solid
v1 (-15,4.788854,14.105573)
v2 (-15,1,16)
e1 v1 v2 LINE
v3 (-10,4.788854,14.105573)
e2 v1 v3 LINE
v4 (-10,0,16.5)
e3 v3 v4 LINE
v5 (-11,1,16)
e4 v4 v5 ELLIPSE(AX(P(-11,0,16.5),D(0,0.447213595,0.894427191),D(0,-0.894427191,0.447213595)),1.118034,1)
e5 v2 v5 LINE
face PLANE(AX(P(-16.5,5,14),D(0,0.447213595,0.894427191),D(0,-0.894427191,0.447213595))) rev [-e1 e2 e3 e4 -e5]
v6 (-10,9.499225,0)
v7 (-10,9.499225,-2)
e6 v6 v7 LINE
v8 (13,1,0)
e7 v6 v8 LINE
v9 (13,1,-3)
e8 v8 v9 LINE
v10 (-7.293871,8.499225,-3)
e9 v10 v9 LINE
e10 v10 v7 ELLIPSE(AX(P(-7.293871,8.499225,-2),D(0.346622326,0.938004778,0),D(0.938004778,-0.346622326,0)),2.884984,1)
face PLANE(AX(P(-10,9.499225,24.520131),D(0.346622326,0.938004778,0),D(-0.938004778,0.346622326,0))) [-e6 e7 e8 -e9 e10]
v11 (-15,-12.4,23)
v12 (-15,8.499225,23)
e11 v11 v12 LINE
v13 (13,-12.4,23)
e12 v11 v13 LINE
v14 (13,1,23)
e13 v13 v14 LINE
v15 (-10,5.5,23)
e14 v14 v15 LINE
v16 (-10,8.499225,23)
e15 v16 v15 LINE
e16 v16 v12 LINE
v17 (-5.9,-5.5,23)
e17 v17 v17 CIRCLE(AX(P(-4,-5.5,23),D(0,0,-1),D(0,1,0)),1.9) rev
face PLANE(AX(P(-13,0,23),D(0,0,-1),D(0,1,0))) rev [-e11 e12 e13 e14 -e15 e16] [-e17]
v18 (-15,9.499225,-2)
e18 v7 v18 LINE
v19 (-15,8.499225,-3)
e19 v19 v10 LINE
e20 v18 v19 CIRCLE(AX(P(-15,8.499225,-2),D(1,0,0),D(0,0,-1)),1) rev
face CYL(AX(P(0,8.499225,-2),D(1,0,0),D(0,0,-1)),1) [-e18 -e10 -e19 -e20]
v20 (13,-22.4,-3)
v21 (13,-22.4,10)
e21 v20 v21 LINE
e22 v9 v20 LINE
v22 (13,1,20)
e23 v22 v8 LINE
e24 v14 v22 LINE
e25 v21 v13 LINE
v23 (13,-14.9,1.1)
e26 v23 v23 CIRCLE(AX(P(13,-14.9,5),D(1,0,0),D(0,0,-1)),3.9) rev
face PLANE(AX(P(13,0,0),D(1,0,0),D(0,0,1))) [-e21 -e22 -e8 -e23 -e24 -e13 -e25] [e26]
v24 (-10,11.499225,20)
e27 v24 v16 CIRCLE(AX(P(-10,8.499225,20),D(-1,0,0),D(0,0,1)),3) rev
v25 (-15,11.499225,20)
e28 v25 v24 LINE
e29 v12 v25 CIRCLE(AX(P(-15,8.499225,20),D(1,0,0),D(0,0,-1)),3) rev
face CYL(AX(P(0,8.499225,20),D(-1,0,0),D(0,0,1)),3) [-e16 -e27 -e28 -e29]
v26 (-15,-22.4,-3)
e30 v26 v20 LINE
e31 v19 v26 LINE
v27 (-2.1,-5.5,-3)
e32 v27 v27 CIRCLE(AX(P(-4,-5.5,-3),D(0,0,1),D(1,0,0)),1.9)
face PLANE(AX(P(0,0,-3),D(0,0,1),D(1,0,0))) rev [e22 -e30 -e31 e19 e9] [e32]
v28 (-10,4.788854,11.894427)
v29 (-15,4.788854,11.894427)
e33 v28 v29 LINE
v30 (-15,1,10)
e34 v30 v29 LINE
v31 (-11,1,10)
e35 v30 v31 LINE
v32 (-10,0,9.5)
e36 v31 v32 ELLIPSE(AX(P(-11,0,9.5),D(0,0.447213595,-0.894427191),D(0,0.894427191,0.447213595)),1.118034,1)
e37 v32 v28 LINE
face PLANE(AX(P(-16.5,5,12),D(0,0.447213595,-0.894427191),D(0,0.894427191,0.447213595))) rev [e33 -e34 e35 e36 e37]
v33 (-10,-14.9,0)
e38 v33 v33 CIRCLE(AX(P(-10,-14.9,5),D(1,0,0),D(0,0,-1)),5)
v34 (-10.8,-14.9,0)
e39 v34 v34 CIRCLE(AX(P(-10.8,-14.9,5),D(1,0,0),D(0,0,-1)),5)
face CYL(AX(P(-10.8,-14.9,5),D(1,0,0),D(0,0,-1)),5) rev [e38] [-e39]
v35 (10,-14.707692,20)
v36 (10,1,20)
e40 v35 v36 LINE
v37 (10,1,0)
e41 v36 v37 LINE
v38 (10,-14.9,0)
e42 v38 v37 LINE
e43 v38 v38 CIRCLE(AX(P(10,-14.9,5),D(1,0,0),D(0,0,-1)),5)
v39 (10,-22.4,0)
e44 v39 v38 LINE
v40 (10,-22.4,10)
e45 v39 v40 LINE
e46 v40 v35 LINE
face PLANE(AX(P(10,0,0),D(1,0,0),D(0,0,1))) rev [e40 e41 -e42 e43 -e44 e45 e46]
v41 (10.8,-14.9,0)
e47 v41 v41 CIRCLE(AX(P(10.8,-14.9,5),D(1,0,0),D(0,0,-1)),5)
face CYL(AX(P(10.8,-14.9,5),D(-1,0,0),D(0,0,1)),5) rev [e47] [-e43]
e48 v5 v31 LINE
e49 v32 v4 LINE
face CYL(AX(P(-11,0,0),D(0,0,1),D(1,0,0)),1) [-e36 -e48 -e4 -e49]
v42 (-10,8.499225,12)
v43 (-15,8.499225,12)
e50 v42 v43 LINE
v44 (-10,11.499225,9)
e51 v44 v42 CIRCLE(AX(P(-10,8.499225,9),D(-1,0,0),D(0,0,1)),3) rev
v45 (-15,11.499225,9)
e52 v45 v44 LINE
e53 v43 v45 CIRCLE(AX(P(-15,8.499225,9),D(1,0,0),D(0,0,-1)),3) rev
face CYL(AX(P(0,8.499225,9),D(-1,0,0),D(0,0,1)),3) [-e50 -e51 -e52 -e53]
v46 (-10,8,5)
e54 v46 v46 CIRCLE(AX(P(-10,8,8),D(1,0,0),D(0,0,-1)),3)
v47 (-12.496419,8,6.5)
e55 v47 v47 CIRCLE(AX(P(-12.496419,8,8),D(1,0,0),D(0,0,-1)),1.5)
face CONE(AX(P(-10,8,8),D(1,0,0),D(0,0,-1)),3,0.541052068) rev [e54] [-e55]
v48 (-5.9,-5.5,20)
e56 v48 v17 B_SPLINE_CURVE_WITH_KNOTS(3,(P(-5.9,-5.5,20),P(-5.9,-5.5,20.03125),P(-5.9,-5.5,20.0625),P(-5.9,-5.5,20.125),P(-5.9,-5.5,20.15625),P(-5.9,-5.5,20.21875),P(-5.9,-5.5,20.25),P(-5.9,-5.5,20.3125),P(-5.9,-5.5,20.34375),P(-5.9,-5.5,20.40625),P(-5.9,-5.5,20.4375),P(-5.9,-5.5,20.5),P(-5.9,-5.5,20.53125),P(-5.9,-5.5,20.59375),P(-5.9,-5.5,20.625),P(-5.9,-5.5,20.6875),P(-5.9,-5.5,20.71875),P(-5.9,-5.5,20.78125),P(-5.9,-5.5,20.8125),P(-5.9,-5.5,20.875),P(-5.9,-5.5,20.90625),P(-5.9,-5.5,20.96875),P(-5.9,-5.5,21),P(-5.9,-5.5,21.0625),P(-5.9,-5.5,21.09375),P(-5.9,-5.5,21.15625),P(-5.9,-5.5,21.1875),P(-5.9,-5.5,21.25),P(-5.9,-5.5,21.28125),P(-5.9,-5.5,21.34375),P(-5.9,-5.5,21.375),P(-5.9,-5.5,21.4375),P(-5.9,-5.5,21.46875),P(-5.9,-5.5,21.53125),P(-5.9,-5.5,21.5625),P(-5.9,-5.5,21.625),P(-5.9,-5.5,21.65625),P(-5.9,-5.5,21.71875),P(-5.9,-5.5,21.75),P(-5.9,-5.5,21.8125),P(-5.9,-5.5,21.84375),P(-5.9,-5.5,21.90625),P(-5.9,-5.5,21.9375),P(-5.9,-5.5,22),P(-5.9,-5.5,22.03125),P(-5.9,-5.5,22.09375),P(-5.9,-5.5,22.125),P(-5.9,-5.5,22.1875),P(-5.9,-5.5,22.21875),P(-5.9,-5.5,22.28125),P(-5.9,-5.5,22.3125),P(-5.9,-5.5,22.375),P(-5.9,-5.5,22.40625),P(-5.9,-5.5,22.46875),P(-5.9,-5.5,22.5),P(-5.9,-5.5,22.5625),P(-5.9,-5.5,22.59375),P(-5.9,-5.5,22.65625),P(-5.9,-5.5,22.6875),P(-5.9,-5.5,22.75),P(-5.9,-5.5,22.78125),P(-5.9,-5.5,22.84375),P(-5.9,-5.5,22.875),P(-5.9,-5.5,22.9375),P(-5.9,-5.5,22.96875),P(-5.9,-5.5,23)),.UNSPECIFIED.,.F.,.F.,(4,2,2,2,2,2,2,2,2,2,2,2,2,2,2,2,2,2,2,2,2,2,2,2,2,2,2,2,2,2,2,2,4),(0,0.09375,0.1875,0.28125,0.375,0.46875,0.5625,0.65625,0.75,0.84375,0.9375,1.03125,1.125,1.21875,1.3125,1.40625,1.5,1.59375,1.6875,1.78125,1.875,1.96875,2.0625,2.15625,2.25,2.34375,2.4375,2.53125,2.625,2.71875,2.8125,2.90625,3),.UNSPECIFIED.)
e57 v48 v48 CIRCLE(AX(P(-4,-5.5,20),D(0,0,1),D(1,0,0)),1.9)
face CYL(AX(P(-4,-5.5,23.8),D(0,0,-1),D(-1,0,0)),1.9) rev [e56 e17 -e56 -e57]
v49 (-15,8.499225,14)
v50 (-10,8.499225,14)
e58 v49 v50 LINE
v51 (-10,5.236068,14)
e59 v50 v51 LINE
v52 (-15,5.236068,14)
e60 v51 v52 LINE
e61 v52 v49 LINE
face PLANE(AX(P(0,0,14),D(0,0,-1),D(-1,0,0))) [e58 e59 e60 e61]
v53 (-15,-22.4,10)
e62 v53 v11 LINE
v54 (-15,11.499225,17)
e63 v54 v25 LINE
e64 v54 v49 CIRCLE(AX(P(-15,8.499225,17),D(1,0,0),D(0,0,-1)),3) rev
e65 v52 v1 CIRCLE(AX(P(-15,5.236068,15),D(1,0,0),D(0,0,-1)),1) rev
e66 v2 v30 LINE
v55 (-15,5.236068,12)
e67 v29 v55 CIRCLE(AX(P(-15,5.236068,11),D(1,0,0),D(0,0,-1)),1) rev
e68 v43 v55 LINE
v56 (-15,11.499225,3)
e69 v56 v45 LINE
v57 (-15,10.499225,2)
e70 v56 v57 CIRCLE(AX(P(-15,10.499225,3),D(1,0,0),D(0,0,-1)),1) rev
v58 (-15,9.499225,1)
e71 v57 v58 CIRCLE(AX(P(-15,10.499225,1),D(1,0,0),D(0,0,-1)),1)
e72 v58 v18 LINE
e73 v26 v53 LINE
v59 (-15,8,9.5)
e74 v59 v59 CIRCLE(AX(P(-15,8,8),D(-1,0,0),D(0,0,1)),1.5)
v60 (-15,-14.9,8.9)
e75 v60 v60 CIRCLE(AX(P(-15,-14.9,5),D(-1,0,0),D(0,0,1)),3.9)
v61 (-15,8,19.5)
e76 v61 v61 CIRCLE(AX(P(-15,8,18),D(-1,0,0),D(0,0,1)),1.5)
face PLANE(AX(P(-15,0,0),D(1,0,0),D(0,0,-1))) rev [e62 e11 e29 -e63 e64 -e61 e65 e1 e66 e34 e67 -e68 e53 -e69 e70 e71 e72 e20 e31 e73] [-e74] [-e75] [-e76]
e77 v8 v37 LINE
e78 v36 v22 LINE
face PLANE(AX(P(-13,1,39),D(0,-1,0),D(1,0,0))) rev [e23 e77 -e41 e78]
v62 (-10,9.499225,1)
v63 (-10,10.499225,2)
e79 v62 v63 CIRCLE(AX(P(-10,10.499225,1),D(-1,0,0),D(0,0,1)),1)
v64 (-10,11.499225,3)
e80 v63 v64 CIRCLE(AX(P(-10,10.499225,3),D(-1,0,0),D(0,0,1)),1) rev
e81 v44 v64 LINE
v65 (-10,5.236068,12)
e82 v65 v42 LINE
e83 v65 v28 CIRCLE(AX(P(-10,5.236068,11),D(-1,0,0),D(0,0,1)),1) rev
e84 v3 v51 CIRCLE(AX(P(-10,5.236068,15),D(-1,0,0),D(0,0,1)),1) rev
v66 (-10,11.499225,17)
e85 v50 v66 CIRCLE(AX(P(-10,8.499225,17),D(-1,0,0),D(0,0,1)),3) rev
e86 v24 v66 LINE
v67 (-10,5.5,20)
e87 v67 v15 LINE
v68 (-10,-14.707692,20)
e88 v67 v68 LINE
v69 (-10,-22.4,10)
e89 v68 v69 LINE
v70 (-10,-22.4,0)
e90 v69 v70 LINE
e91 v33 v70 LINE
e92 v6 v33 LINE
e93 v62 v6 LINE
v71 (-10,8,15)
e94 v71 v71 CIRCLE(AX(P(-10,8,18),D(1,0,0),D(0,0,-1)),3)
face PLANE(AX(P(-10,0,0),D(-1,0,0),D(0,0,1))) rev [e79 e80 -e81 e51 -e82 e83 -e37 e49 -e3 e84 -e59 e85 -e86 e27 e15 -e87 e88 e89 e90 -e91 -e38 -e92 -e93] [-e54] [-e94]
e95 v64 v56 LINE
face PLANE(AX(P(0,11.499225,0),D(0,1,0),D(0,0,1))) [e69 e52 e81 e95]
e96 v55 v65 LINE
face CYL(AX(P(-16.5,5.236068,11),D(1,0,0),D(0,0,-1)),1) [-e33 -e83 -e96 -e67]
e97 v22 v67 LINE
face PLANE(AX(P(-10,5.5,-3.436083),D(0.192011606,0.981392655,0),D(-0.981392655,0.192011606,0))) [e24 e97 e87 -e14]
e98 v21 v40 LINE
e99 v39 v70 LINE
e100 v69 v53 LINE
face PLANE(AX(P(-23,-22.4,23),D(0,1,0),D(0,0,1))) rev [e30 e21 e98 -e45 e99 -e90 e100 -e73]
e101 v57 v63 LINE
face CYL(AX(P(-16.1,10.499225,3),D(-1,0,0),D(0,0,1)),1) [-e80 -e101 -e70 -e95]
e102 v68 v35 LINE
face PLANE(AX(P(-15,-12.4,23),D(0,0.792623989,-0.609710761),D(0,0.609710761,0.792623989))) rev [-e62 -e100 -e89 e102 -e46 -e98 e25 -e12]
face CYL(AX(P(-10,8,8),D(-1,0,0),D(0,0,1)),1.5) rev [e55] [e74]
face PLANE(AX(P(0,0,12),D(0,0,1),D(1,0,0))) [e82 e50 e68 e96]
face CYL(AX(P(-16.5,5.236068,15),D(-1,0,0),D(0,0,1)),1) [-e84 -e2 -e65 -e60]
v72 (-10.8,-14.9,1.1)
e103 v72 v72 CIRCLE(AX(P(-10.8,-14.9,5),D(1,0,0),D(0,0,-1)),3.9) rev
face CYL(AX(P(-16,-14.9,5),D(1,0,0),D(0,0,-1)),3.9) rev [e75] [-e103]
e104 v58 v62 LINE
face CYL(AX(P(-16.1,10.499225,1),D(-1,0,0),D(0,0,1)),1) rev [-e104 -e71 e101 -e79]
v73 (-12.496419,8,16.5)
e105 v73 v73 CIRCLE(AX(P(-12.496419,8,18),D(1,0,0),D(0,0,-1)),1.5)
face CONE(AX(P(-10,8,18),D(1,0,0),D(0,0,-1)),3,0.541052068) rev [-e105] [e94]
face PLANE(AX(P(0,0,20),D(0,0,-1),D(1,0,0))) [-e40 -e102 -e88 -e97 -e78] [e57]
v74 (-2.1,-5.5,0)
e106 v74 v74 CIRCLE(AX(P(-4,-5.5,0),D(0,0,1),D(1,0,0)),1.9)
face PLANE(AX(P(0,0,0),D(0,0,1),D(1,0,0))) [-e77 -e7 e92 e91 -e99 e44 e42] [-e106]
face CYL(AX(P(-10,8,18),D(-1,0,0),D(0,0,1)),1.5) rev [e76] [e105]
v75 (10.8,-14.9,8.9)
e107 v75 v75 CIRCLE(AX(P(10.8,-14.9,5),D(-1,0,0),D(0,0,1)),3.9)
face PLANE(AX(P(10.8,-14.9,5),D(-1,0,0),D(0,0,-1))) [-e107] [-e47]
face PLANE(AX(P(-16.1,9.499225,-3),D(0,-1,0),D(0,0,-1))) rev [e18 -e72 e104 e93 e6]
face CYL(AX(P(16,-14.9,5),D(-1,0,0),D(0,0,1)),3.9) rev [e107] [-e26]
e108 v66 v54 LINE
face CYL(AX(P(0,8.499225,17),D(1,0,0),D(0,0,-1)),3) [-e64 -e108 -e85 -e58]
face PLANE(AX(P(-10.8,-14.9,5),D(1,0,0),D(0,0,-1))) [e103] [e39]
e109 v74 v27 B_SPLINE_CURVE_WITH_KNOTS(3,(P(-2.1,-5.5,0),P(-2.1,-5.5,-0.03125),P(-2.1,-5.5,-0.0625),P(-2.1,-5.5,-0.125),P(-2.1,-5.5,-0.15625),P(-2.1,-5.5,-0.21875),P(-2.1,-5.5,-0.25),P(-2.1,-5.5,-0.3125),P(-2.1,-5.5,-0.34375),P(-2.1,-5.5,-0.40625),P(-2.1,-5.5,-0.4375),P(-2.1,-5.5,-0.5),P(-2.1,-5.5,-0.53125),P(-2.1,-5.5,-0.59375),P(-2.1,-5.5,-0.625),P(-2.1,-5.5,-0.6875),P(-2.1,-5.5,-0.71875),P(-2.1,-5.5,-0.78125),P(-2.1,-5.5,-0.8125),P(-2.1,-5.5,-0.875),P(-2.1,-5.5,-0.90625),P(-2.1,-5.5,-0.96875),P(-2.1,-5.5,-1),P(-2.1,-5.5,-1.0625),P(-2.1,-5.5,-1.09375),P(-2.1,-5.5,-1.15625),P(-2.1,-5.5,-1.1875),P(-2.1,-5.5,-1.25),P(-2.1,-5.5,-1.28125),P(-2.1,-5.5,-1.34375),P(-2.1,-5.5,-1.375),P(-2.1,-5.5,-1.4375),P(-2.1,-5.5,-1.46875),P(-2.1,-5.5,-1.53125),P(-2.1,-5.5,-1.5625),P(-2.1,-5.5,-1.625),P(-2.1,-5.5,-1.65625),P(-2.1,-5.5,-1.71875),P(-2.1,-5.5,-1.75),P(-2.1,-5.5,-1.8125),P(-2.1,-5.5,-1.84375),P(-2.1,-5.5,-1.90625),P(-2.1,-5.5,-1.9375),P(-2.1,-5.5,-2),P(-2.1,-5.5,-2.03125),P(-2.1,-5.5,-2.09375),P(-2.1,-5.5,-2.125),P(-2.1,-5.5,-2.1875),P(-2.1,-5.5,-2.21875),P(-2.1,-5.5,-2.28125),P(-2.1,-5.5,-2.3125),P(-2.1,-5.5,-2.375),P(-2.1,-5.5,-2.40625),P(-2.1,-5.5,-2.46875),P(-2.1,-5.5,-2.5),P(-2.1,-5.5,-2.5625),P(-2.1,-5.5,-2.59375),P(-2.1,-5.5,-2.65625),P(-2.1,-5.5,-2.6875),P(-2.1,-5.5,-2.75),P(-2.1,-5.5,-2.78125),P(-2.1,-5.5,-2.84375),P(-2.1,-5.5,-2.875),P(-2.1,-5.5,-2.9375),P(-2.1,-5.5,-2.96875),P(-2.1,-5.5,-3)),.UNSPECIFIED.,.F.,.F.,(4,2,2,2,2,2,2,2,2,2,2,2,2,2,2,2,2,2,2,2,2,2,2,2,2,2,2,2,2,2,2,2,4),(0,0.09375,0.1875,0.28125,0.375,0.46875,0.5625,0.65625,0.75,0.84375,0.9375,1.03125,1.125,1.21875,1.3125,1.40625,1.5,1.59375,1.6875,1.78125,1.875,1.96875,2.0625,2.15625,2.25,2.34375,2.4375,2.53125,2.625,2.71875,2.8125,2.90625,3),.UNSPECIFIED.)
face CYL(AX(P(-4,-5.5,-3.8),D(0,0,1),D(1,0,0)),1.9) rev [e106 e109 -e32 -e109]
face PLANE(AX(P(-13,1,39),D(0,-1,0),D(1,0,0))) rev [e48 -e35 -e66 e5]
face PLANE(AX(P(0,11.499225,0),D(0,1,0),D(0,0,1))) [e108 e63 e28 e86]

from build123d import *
from build123d.topology import SkipClean

# Parameters (mm, degrees)
SKETCH_1_W                = 20
SKETCH_1_H                = 57.76596942167697
EXTRUDE_1_DEPTH           = 3
EXTRUDE_2_DEPTH           = 3
CUT_EXTRUDE_1_DEPTH       = 6
SKETCH_8_R                = 4.48
CUT_EXTRUDE_2_DEPTH       = 0.8
SKETCH_9_R                = 1.9
CUT_EXTRUDE_3_DEPTH       = 3.8
SKETCH_12_W               = 26.000000000000007
SKETCH_12_H               = 35.36596942167698
CUT_EXTRUDE_4_DEPTH       = 36.00000000000001
CUT_EXTRUDE_8_DEPTH       = 28.00000000000001
SKETCH_23_W               = 26.000000000000004
SKETCH_23_H               = 26
SKETCH_23_W_2             = 20
SKETCH_23_H_2             = 19.999999999999993
EXTRUDE_7_DEPTH           = 4
SKETCH_24_W               = 20
SKETCH_24_H               = 19.999999999999993
EXTRUDE_8_DEPTH           = 3
SKETCH_25_W               = 5.000000000000002
SKETCH_25_H               = 16
SKETCH_25_R               = 1.4999999999999991
EXTRUDE_9_DEPTH           = 3
FILLET_1_R                = 1
CUT_EXTRUDE_9_DEPTH       = 3
SKETCH_27_R               = 1.4999999999999987
CUT_EXTRUDE_10_DEPTH      = 3
SKETCH_28_W               = 20
SKETCH_28_H               = 19.999999999999993
CUT_EXTRUDE_11_DEPTH      = 10
CUT_EXTRUDE_12_DEPTH      = 42.00000000000001
SKETCH_31_R               = 4.48
SKETCH_31_R_2             = 3.98
EXTRUDE_13_DEPTH          = 0.8
SKETCH_32_R               = 5.000000000000001
SKETCH_32_R_2             = 3.98
CUT_EXTRUDE_13_DEPTH      = 0.8
SKETCH_33_R               = 4.48
EXTRUDE_14_DEPTH          = 3
SKETCH_36_R               = 5.000000000000001
CUT_EXTRUDE_14_DEPTH      = 3
SKETCH_37_R               = 3.98
SKETCH_37_R_2             = 3.900000000000001
EXTRUDE_17_DEPTH          = 0.8
SKETCH_38_R               = 1.5000000000000009
EXTRUDE_18_DEPTH          = 3
SKETCH_39_W               = 4.187599959799879
SKETCH_39_H               = 1.3608825238343043
EXTRUDE_19_DEPTH          = 3
EXTRUDE_START             = 2
SKETCH_43_R               = 1.5000000000000024
SKETCH_43_R_2             = 1.5000000000000009
SKETCH_43_R_3             = 3.900000000000002
EXTRUDE_22_DEPTH          = 2
SKETCH_44_W               = 5
SKETCH_44_H               = 9.399224841629362
EXTRUDE_23_DEPTH          = 2
EXTRUDE_24_DEPTH          = 3
SKETCH_47_W               = 5
SKETCH_47_H               = 9.399224841629362
EXTRUDE_25_DEPTH          = 8
SKETCH_51_W               = 5
SKETCH_51_H               = 14
SKETCH_51_H_2             = 7.999999999999998
EXTRUDE_28_DEPTH          = 1.1
CUT_EXTRUDE_16_DEPTH      = 6.1000000000000005
FILLET_START              = -16
FILLET_9_DEPTH            = 7
FILLET_START_2            = -15
FILLET_9_2_DEPTH          = 5
EXTRUDE_30_DEPTH          = 3
FILLET_10_R               = 1
SKETCH_57_W               = 5
SKETCH_57_H               = 10.499224841629362
EXTRUDE_31_DEPTH          = 1
SKETCH_58_W               = 5
SKETCH_58_H               = 10.499224841629362
EXTRUDE_32_DEPTH          = 1
FILLET_11_R               = 3
CUT_EXTRUDE_19_DEPTH      = 6.500000000000001
FILLET_14_R               = 1
FILLET_19_R               = 1
HOLE_WIZARD_1_D           = 3
HOLE_WIZARD_1_DEPTH       = 5
HOLE_WIZARD_1_CSINK_D     = 6
HOLE_WIZARD_1_CSINK_ANGLE = 62


with BuildPart() as part:
    # 草图1 → 凸台-拉伸1 (new body)
    with BuildSketch(Plane.XY):
        with Locations((0, -28.882984710838485)):
            Rectangle(SKETCH_1_W, SKETCH_1_H)
    extrude_1 = extrude(amount=-EXTRUDE_1_DEPTH)

    # 草图2 → 凸台-拉伸2 (add)
    with BuildSketch(Plane.ZY.offset(10)):
        Polygon((-3, -1.22e-15), (23, 0), (23.000000000000007, -57.76596942167697), (-3, -57.76596942167697), align=None)
    extrude_2 = extrude(amount=EXTRUDE_2_DEPTH)

    # 草图7 → 切除-拉伸1 (cut)
    with BuildSketch(Plane(origin=(-10, 0, 0), x_dir=(0, 0, -1), z_dir=(1, 0, 0))):
        with BuildLine():
            ThreePointArc((-1.0999999999999996, -14.899999999999997), (-5, -10.999999999999996), (-8.9, -14.899999999999997))
            Line((-8.9, -14.899999999999997), (-1.1000000000000014, -14.899999999999997))
        make_face()
        with BuildLine():
            Line((-1.1000000000000014, -14.899999999999997), (-8.9, -14.899999999999997))
            ThreePointArc((-8.9, -14.899999999999997), (-5.000000000000001, -18.799999999999997), (-1.0999999999999996, -14.899999999999999))
        make_face()
    cut_extrude_1 = extrude(amount=-CUT_EXTRUDE_1_DEPTH, mode=Mode.SUBTRACT)

    # 草图8 → 切除-拉伸2 (cut)
    with BuildSketch(Plane.ZY.offset(13.000000000000002)):
        with Locations((5, -14.899999999999997)):
            Circle(SKETCH_8_R)
    cut_extrude_2 = extrude(amount=-CUT_EXTRUDE_2_DEPTH, mode=Mode.SUBTRACT)

    # 草图9 → 切除-拉伸3 (cut)
    with BuildSketch(Plane.XY):
        with Locations((-4, -5.499999999999998)):
            Circle(SKETCH_9_R)
    cut_extrude_3 = extrude(amount=-CUT_EXTRUDE_3_DEPTH, mode=Mode.SUBTRACT)

    # 镜向1: 凸台-拉伸2 across plane
    add(extrude_2.mirror(Plane(origin=(0, 0, 0), x_dir=(0, 0, 1), z_dir=(1, 0, 0))))

    # 镜向2: 切除-拉伸1, 切除-拉伸2 across plane
    add(cut_extrude_1.mirror(Plane(origin=(0, 0, 0), x_dir=(0, 0, 1), z_dir=(1, 0, 0))), mode=Mode.SUBTRACT)
    add(cut_extrude_2.mirror(Plane(origin=(0, 0, 0), x_dir=(0, 0, 1), z_dir=(1, 0, 0))), mode=Mode.SUBTRACT)

    # 镜向3: 凸台-拉伸1 across plane
    add(extrude_1.mirror(Plane.XY.offset(10)))

    # 镜向5: 切除-拉伸3 across plane
    add(cut_extrude_3.mirror(Plane.XY.offset(10)), mode=Mode.SUBTRACT)

    # 草图12 → 切除-拉伸4 (cut)
    with BuildSketch(Plane(origin=(13.000000000000002, 0, 0), x_dir=(0, 0, -1), z_dir=(1, 0, 0))):
        with Locations((-10.000000000000004, -40.08298471083848)):
            Rectangle(SKETCH_12_W, SKETCH_12_H)
    extrude(amount=-CUT_EXTRUDE_4_DEPTH, mode=Mode.SUBTRACT)

    # 草图22 → 切除-拉伸8 (cut)
    with BuildSketch(Plane(origin=(13.000000000000002, 0, 0), x_dir=(0, 0, -1), z_dir=(1, 0, 0))):
        Polygon((-23.000000000000007, -12.399999999999997), (-23.000000000000007, -22.399999999999995), (-10.000000000000007, -22.399999999999995), align=None)
    extrude(amount=-CUT_EXTRUDE_8_DEPTH, mode=Mode.SUBTRACT)

    # 草图23 → 凸台-拉伸7 (add)
    with BuildSketch(Plane(origin=(0, 0, 0), x_dir=(1, 0, 0), z_dir=(0, 1, 0))):
        with Locations((0, -10)):
            Rectangle(SKETCH_23_W, SKETCH_23_H)
        with Locations((0, -9.999999999999996)):
            Rectangle(SKETCH_23_W_2, SKETCH_23_H_2, mode=Mode.SUBTRACT)
    extrude(amount=EXTRUDE_7_DEPTH)

    # 草图24 → 凸台-拉伸8 (add)
    with BuildSketch(Plane(origin=(0, 4, 0), x_dir=(1, 0, 0), z_dir=(0, 1, 0))):
        with Locations((0, -9.999999999999996)):
            Rectangle(SKETCH_24_W, SKETCH_24_H)
    extrude(amount=-EXTRUDE_8_DEPTH)

    # 草图25 → 凸台-拉伸9 (add)
    with BuildSketch(Plane(origin=(0, 4, 0), x_dir=(1, 0, 0), z_dir=(0, 1, 0))):
        with Locations((15.500000000000004, -15)):
            Rectangle(SKETCH_25_W, SKETCH_25_H)
        with Locations(Location((15.500000000000002, -20.23329325648959, 0), (0, 0, 270))):
            Circle(SKETCH_25_R, mode=Mode.SUBTRACT)
        with Locations(Location((15.500000000000002, -10.23329325648959, 0), (0, 0, 270))):
            Circle(SKETCH_25_R, mode=Mode.SUBTRACT)
    extrude(amount=-EXTRUDE_9_DEPTH)

    # 圆角1
    fillet_1_edges = [part.edges().sort_by_distance(p)[0] for p in [
        (18.000000000000004, 1, 15),
    ]]
    fillet(fillet_1_edges, radius=FILLET_1_R)

    # 草图26 → 切除-拉伸9 (cut)
    with BuildSketch(Plane(origin=(13.000000000000002, 0, 0), x_dir=(0, 0, -1), z_dir=(1, 0, 0))):
        with BuildLine():
            Line((-16, 1.0000000000000004), (-13.999999999999998, 1.0000000000000004))
            ThreePointArc((-13.999999999999998, 1.0000000000000004), (-15, 0), (-16, 1.0000000000000004))
        make_face()
    extrude(amount=-CUT_EXTRUDE_9_DEPTH, mode=Mode.SUBTRACT)

    # 草图27 → 切除-拉伸10 (cut)
    with BuildSketch(Plane(origin=(0, 4, 0), x_dir=(1, 0, 0), z_dir=(0, 1, 0))):
        with Locations(Location((7.500000000000002, -15.233293256489592, 0), (0, 0, 270))):
            Circle(SKETCH_27_R)
    extrude(amount=-CUT_EXTRUDE_10_DEPTH, mode=Mode.SUBTRACT)

    # 草图28 → 切除-拉伸11 (cut)
    with BuildSketch(Plane.XZ.offset(-1)):
        with Locations((0, 9.999999999999996)):
            Rectangle(SKETCH_28_W, SKETCH_28_H)
    extrude(amount=-CUT_EXTRUDE_11_DEPTH, mode=Mode.SUBTRACT)

    # 草图29 → 切除-拉伸12 (cut)
    with BuildSketch(Plane(origin=(0, 0, -3), x_dir=(-1, 0, 0), z_dir=(0, 0, -1))):
        Polygon((13.000000000000002, 4), (-24.68163228941081, 4), (-24.68163228941081, 0.9999999999999957), (13.000000000000002, 1.0000000000000002), align=None)
    extrude(amount=-CUT_EXTRUDE_12_DEPTH, mode=Mode.SUBTRACT)

    # 草图31 → 凸台-拉伸13 (add)
    with BuildSketch(Plane.ZY.offset(12.200000000000001)):
        with Locations((5, -14.899999999999997)):
            Circle(SKETCH_31_R)
        with Locations((5, -14.899999999999997)):
            Circle(SKETCH_31_R_2, mode=Mode.SUBTRACT)
    extrude(amount=EXTRUDE_13_DEPTH)

    # 草图32 → 切除-拉伸13 (cut)
    with BuildSketch(Plane(origin=(-10, 0, 0), x_dir=(0, 0, -1), z_dir=(1, 0, 0))):
        with Locations((-5, -14.899999999999997)):
            Circle(SKETCH_32_R)
        with Locations(Location((-5, -14.899999999999997, 0), (0, 0, 180))):
            Circle(SKETCH_32_R_2, mode=Mode.SUBTRACT)
    cut_extrude_13 = extrude(amount=-CUT_EXTRUDE_13_DEPTH, mode=Mode.SUBTRACT)

    # 草图33 → 凸台-拉伸14 (add)
    with BuildSketch(Plane(origin=(13.000000000000002, 0, 0), x_dir=(0, 0, -1), z_dir=(1, 0, 0))):
        with Locations((-5, -14.899999999999997)):
            Circle(SKETCH_33_R)
    extrude(amount=-EXTRUDE_14_DEPTH)

    # 镜向6: 切除-拉伸1, 切除-拉伸13 across plane
    add(cut_extrude_1.mirror(Plane(origin=(0, 0, 0), x_dir=(0, 0, 1), z_dir=(1, 0, 0))), mode=Mode.SUBTRACT)
    add(cut_extrude_13.mirror(Plane(origin=(0, 0, 0), x_dir=(0, 0, 1), z_dir=(1, 0, 0))), mode=Mode.SUBTRACT)

    # 草图36 → 切除-拉伸14 (cut)
    with BuildSketch(Plane(origin=(-10.8, 0, 0), x_dir=(0, 0, -1), z_dir=(1, 0, 0))):
        with Locations((-5, -14.899999999999997)):
            Circle(SKETCH_36_R)
    cut_extrude_14 = extrude(amount=CUT_EXTRUDE_14_DEPTH, mode=Mode.SUBTRACT)

    # 镜向7: 切除-拉伸14 across plane
    add(cut_extrude_14.mirror(Plane(origin=(0, 0, 0), x_dir=(0, 0, 1), z_dir=(1, 0, 0))), mode=Mode.SUBTRACT)

    # 草图37 → 凸台-拉伸17 (add)
    with SkipClean():  # the faces are left unmerged after this step: merging them gives an invalid solid
        with BuildSketch(Plane.ZY.offset(12.200000000000001)):
            with Locations((5, -14.899999999999997)):
                Circle(SKETCH_37_R)
            with Locations((5, -14.899999999999997)):
                Circle(SKETCH_37_R_2, mode=Mode.SUBTRACT)
        extrude(amount=EXTRUDE_17_DEPTH)

    # 草图38 → 凸台-拉伸18 (add)
    # profile 1 of 2: a face of its own
    with SkipClean():  # the faces are left unmerged after this step: merging them gives an invalid solid
        with BuildSketch(Plane.ZY.offset(13.000000000000002)):
            Polygon((15, 10.399224841629362), (15, 1), (20.999999999999996, 1.0000000000000002), (20.999999999999996, 10.399224841629362), align=None)
            with Locations((18, 8)):
                Circle(SKETCH_38_R, mode=Mode.SUBTRACT)
        # profile 2 of 2: a face of its own
        with BuildSketch(Plane.ZY.offset(13.000000000000002)):
            Polygon((11, 1), (11, 10.399224841629362), (5.000000000000001, 10.399224841629362), (5.000000000000001, 1.0000000000000002), align=None)
            with Locations((8, 8)):
                Circle(SKETCH_38_R, mode=Mode.SUBTRACT)
        extrude(amount=-EXTRUDE_18_DEPTH)

    # 草图39 → 凸台-拉伸19 (add)
    with SkipClean():  # the faces are left unmerged after this step: merging them gives an invalid solid
        with BuildSketch(Plane(origin=(13.000000000000002, 0, 0), x_dir=(0, 0, -1), z_dir=(1, 0, 0))):
            with Locations((-15.28799119011226, 0.3195587380828476)):
                Rectangle(SKETCH_39_W, SKETCH_39_H)
        extrude(amount=-EXTRUDE_19_DEPTH)

    # 草图43 → 凸台-拉伸22 (add)
    with BuildSketch(Plane.ZY.offset(13.000000000000002).offset(EXTRUDE_START)):
        Polygon((-3, 1.0000000000000002), (5.000000000000004, 1.0000000000000002), (5.000000000000001, 10.399224841629362), (11, 10.399224841629362), (11, 1.0000000000000002), (15, 1.0000000000000002), (15, 10.399224841629362), (20.999999999999996, 10.399224841629362), (20.999999999999996, 1.0000000000000002), (23.000000000000007, 1.0000000000000002), (23.000000000000007, -12.399999999999997), (10.000000000000009, -22.399999999999995), (-3, -22.399999999999995), align=None)
        with Locations((8, 8)):
            Circle(SKETCH_43_R, mode=Mode.SUBTRACT)
        with Locations((18, 8)):
            Circle(SKETCH_43_R_2, mode=Mode.SUBTRACT)
        with Locations((5, -14.899999999999997)):
            Circle(SKETCH_43_R_3, mode=Mode.SUBTRACT)
    extrude(amount=-EXTRUDE_22_DEPTH)

    # 草图44 → 凸台-拉伸23 (add)
    with BuildSketch(Plane.XY.offset(20.999999999999996)):
        with Locations((-12.500000000000002, 5.699612420814681)):
            Rectangle(SKETCH_44_W, SKETCH_44_H)
    extrude(amount=EXTRUDE_23_DEPTH)

    # 草图45 → 凸台-拉伸24 (add)
    with BuildSketch(Plane.XY.offset(23)):
        Polygon((-10.000000000000002, 0.9999999999999981), (13.000000000000002, 0.9999999999999943), (-10.000000000000002, 5.499999999999998), align=None)
    extrude(amount=-EXTRUDE_24_DEPTH)

    # 草图47 → 凸台-拉伸25 (add)
    with BuildSketch(Plane(origin=(0, 0, 5.000000000000001), x_dir=(-1, 0, 0), z_dir=(0, 0, -1))):
        with Locations((12.500000000000002, 5.699612420814681)):
            Rectangle(SKETCH_47_W, SKETCH_47_H)
    extrude(amount=EXTRUDE_25_DEPTH)

    # 草图51 → 凸台-拉伸28 (add)
    with BuildSketch(Plane(origin=(0, 10.399224841629362, 0), x_dir=(1, 0, 0), z_dir=(0, 1, 0))):
        with Locations((-12.500000000000002, -4)):
            Rectangle(SKETCH_51_W, SKETCH_51_H)
        with Locations((-12.500000000000002, -19)):
            Rectangle(SKETCH_51_W, SKETCH_51_H_2)
    extrude(amount=EXTRUDE_28_DEPTH)

    # 草图53 → 切除-拉伸16 (cut)
    with BuildSketch(Plane(origin=(-10, 0, 0), x_dir=(0, 0, -1), z_dir=(1, 0, 0))):
        Polygon((2.999999999999999, 11.499224841629362), (-2.000000000000001, 11.499224841629362), (-2.0000000000000004, 9.49922484162936), (2.999999999999999, 9.499224841629362), align=None)
    extrude(amount=-CUT_EXTRUDE_16_DEPTH, mode=Mode.SUBTRACT)

    # 圆角9: read off the stored shape, not the designer's step
    # 圆角9 outline → 圆角9 (cut)
    with BuildSketch(Plane.YZ.offset(FILLET_START)):
        with BuildLine():
            Line((11.499224842, 2), (11.499224842, 3))
            ThreePointArc((11.499224842, 3), (11.206331623, 2.292893219), (10.499224842, 2))
            Line((10.499224842, 2), (11.499224842, 2))
        make_face()
    extrude(amount=FILLET_9_DEPTH, mode=Mode.SUBTRACT)

    # Fillet 9 2 outline → Fillet 9 2 (add)
    with BuildSketch(Plane.YZ.offset(FILLET_START_2)):
        with BuildLine():
            ThreePointArc((9.499224842, 1), (9.79211806, 1.707106782), (10.499224842, 2))
            Line((10.499224842, 2), (9.499224842, 2))
            Line((9.499224842, 2), (9.499224842, 1))
        make_face()
    extrude(amount=FILLET_9_2_DEPTH)

    # 草图54 → 凸台-拉伸30 (add)
    with BuildSketch(Plane(origin=(0, 0, -3), x_dir=(-1, 0, 0), z_dir=(0, 0, -1))):
        Polygon((-13.000000000000002, 0.9999999999999972), (10.000000000000002, 1.0000000000000002), (10, 9.499224841629362), align=None)
    extrude(amount=-EXTRUDE_30_DEPTH)

    # 圆角10
    fillet_10_edges = [part.edges().sort_by_distance(p)[0] for p in [
        (-12.5, 9.499224841629362, -2.999999999999999),
    ]]
    fillet(fillet_10_edges, radius=FILLET_10_R)

    # 草图57 → 凸台-拉伸31 (add)
    with BuildSketch(Plane(origin=(0, 0, 15), x_dir=(-1, 0, 0), z_dir=(0, 0, -1))):
        with Locations((12.500000000000002, 6.249612420814681)):
            Rectangle(SKETCH_57_W, SKETCH_57_H)
    extrude(amount=EXTRUDE_31_DEPTH)

    # 草图58 → 凸台-拉伸32 (add)
    with BuildSketch(Plane.XY.offset(11)):
        with Locations((-12.500000000000002, 6.249612420814681)):
            Rectangle(SKETCH_58_W, SKETCH_58_H)
    extrude(amount=EXTRUDE_32_DEPTH)

    # 圆角11
    # the kernel refuses this fillet: 3 mm, written as the material it takes off along each edge
    with BuildSketch(Plane(origin=(-2.5000000000000018, 11.499224841629362, 23), x_dir=(0, -1, 0), z_dir=(-1, 0, 0)), Plane(origin=(-2.5000000000000018, 11.499224841629362, 14), x_dir=(0, 0, 1), z_dir=(-1, 0, 0))) as fillet_11_piece_1:
        with BuildLine():
            CenterArc((FILLET_11_R, -FILLET_11_R), FILLET_11_R, 90, 90)
            Line((0, -FILLET_11_R), (0, 0))
            Line((0, 0), (FILLET_11_R, 0))
        make_face()
    extrude(amount=20, mode=Mode.SUBTRACT)
    with BuildSketch(Plane(origin=(-22.5, 11.499224841629362, 12), x_dir=(0, -1, 0), z_dir=(1, 0, 0))) as fillet_11_piece_2:
        with BuildLine():
            CenterArc((FILLET_11_R, FILLET_11_R), FILLET_11_R, 180, 90)
            Line((0, FILLET_11_R), (0, 0))
            Line((0, 0), (FILLET_11_R, 0))
        make_face()
    extrude(amount=20, mode=Mode.SUBTRACT)

    # 草图61 → 切除-拉伸19 (cut)
    with BuildSketch(Plane(origin=(-10, 0, 0), x_dir=(0, 0, -1), z_dir=(1, 0, 0))):
        Polygon((-12, 1.0000000000000002), (-12, 5), (-10, 1.0000000000000007), align=None)
        Polygon((-13.999999999999998, 1.0000000000000002), (-13.999999999999998, 5), (-16, 0.9999999999999998), align=None)
    extrude(amount=-CUT_EXTRUDE_19_DEPTH, mode=Mode.SUBTRACT)

    # 圆角14
    fillet_14_edges = [part.edges().sort_by_distance(p)[0] for p in [
        (-10, 1.0000000000000002, 13),
    ]]
    fillet(fillet_14_edges, radius=FILLET_14_R)

    # 圆角19
    fillet_19_edges = [part.edges().sort_by_distance(p)[0] for p in [
        (-12.5, 5, 12),
        (-12.5, 5, 13.999999999999998),
    ]]
    fillet(fillet_19_edges, radius=FILLET_19_R)

    # 打孔尺寸(%根据)内六角花形沉头螺钉的类型1
    with Locations(Plane(origin=(-10, 8, 18), x_dir=(0, 0, 1), z_dir=(1, 0, 0))):
        with Locations((0, 0), (-10, 0)):
            CounterSinkHole(HOLE_WIZARD_1_D / 2, HOLE_WIZARD_1_CSINK_D / 2, depth=HOLE_WIZARD_1_DEPTH, counter_sink_angle=HOLE_WIZARD_1_CSINK_ANGLE)


solid = part.part
